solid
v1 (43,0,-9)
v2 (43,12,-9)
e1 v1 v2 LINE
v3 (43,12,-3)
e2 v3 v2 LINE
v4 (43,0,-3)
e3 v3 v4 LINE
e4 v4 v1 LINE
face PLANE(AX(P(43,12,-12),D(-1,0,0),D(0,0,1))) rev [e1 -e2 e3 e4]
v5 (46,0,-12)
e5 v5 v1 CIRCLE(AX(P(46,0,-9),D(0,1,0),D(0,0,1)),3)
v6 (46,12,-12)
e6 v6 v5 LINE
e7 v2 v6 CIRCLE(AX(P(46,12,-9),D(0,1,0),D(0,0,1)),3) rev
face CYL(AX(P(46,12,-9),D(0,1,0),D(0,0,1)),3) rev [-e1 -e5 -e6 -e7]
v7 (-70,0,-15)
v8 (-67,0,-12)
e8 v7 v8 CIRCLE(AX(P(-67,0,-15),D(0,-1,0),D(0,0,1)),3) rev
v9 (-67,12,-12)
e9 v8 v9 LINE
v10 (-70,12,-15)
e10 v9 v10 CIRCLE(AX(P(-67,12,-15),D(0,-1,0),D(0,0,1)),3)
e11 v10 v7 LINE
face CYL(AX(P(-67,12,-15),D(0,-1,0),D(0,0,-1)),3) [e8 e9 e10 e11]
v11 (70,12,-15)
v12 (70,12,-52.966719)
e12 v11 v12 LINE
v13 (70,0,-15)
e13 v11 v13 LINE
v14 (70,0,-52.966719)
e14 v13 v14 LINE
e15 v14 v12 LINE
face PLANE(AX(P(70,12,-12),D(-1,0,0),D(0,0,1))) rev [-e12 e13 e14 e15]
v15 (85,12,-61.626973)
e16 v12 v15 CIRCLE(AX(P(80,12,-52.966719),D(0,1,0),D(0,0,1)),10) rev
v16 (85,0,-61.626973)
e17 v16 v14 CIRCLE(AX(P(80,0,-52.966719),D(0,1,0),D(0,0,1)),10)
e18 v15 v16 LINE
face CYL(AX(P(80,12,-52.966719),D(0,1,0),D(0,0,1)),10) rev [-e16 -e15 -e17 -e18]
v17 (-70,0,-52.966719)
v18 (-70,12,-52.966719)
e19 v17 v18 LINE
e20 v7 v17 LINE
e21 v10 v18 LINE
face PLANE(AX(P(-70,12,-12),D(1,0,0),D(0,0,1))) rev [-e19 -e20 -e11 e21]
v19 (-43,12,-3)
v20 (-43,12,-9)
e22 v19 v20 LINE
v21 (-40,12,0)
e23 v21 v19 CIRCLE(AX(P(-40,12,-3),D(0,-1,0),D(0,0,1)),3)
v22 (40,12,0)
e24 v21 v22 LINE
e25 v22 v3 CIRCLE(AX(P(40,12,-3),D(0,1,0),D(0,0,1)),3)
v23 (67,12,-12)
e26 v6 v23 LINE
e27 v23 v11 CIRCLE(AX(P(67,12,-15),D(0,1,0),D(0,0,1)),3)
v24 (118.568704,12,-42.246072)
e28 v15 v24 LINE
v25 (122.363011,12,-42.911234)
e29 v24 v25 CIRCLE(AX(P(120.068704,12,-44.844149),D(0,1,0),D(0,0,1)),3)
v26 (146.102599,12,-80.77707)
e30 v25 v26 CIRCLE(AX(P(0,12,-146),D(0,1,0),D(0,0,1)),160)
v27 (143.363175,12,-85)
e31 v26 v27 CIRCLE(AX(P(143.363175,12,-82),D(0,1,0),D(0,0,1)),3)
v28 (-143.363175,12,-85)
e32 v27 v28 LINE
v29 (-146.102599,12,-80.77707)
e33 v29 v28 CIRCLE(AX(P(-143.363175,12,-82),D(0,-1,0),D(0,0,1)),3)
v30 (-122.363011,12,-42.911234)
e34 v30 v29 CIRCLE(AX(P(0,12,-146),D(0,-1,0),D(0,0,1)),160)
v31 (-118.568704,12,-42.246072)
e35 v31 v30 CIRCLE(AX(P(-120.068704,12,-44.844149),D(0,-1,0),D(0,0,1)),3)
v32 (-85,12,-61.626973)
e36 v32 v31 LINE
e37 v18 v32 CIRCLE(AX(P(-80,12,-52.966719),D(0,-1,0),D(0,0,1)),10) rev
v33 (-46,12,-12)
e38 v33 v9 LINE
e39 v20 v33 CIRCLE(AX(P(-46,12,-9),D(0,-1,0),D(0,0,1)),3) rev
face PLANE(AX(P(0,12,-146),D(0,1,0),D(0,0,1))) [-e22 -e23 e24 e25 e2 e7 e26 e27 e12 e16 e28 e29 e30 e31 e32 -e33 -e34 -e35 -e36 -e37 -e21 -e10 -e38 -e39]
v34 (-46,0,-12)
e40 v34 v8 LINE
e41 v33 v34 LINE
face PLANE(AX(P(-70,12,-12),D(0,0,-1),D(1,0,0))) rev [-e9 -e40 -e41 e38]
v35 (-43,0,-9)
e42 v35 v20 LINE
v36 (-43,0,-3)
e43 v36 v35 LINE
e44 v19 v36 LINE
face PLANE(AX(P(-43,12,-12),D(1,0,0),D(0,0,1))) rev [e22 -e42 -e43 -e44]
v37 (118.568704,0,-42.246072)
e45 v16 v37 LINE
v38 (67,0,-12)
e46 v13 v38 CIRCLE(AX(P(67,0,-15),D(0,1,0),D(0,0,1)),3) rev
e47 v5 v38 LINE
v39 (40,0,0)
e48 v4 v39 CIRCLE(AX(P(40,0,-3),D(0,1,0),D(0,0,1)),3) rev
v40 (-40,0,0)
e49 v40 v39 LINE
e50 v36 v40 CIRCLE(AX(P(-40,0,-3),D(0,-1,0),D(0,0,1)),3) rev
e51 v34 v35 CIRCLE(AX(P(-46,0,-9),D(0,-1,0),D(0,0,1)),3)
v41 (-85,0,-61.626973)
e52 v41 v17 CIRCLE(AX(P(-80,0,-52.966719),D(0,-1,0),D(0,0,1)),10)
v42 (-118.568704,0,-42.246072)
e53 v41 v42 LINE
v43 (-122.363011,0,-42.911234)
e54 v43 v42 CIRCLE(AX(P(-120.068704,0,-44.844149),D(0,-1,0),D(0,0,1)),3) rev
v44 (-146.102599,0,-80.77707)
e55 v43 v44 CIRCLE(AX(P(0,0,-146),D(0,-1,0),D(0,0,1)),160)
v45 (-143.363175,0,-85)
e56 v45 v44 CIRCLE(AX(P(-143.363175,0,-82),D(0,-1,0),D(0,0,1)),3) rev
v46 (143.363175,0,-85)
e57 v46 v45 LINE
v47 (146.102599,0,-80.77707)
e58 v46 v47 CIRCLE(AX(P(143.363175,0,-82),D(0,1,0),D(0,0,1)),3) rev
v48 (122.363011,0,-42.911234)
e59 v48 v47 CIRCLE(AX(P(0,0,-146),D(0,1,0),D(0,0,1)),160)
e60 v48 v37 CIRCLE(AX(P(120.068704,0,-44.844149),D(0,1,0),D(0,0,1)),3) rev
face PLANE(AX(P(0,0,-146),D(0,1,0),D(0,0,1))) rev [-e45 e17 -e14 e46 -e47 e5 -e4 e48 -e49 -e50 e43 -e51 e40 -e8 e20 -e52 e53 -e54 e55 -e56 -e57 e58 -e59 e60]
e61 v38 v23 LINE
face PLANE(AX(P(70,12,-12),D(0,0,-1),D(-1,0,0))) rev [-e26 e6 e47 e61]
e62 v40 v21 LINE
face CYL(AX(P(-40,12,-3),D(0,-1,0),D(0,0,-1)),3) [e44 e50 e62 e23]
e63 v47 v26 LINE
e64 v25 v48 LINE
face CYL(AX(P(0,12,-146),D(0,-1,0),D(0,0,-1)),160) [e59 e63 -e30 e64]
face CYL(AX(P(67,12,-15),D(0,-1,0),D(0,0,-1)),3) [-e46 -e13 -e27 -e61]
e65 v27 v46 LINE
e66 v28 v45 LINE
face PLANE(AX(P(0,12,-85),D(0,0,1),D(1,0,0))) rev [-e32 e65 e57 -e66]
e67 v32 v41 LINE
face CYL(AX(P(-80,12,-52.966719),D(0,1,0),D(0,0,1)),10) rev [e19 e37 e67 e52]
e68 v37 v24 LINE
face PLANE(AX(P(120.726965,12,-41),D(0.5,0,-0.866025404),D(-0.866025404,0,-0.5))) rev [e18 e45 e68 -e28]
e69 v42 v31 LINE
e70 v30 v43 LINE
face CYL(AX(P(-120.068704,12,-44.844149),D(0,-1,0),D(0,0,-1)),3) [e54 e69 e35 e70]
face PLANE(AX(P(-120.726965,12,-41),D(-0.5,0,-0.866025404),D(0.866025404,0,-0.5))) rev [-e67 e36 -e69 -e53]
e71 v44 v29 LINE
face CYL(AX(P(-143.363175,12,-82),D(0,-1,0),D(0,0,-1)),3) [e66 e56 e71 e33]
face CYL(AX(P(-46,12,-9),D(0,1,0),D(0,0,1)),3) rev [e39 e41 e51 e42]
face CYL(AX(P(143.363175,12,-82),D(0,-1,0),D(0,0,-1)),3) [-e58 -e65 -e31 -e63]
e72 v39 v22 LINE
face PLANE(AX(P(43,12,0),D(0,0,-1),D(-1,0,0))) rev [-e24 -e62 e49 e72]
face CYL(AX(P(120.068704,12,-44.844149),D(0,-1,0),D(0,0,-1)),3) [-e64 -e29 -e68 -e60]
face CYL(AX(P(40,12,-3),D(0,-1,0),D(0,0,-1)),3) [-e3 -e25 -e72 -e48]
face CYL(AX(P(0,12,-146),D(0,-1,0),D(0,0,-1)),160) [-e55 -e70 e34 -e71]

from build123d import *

# Parameters (mm, degrees)
T_LE_DE_BASE_PLI_E1_DEPTH = 12
CONG_1_R                  = 10
CONG_2_R                  = 3


# Sheet-metal steps are written as plain solids
with BuildPart() as part:
    # Esquisse1 → Tôle de base pliée1 (new body)
    with BuildSketch(Plane(origin=(0, 0, 0), x_dir=(1, 0, 0), z_dir=(0, 1, 0))):
        with BuildLine():
            Line((0, 0), (0, 85))
            Line((0, 85), (147.915516427, 85))
            ThreePointArc((147.915516427, 85), (136.110968197, 61.894088575), (120.726964676, 41))
            Line((120.726964676, 41), (70, 70.287226711))
            Line((70, 70.287226711), (70, 12))
            Line((70, 12), (43, 12))
            Line((43, 12), (43, 0))
            Line((43, 0), (0, 0))
        make_face()
    extrude(amount=T_LE_DE_BASE_PLI_E1_DEPTH)

    # Congé1
    cong_1_edges = [part.edges().sort_by_distance(p)[0] for p in [
        (70, 6, -70.287226711),
    ]]
    fillet(cong_1_edges, radius=CONG_1_R)

    # Congé2
    cong_2_edges = [part.edges().sort_by_distance(p)[0] for p in [
        (147.915516427, 6, -85),
        (120.726964676, 6, -41),
        (70, 6, -12),
        (43, 6, -12),
        (43, 6, 0),
    ]]
    fillet(cong_2_edges, radius=CONG_2_R)

    # Symétrie1: part across plane


with BuildPart() as part_1:
    add(part.part)
    add(part.part.mirror(Plane(origin=(0, 12, 0), x_dir=(0, 0, 1), z_dir=(1, 0, 0))))


solid = part_1.part
